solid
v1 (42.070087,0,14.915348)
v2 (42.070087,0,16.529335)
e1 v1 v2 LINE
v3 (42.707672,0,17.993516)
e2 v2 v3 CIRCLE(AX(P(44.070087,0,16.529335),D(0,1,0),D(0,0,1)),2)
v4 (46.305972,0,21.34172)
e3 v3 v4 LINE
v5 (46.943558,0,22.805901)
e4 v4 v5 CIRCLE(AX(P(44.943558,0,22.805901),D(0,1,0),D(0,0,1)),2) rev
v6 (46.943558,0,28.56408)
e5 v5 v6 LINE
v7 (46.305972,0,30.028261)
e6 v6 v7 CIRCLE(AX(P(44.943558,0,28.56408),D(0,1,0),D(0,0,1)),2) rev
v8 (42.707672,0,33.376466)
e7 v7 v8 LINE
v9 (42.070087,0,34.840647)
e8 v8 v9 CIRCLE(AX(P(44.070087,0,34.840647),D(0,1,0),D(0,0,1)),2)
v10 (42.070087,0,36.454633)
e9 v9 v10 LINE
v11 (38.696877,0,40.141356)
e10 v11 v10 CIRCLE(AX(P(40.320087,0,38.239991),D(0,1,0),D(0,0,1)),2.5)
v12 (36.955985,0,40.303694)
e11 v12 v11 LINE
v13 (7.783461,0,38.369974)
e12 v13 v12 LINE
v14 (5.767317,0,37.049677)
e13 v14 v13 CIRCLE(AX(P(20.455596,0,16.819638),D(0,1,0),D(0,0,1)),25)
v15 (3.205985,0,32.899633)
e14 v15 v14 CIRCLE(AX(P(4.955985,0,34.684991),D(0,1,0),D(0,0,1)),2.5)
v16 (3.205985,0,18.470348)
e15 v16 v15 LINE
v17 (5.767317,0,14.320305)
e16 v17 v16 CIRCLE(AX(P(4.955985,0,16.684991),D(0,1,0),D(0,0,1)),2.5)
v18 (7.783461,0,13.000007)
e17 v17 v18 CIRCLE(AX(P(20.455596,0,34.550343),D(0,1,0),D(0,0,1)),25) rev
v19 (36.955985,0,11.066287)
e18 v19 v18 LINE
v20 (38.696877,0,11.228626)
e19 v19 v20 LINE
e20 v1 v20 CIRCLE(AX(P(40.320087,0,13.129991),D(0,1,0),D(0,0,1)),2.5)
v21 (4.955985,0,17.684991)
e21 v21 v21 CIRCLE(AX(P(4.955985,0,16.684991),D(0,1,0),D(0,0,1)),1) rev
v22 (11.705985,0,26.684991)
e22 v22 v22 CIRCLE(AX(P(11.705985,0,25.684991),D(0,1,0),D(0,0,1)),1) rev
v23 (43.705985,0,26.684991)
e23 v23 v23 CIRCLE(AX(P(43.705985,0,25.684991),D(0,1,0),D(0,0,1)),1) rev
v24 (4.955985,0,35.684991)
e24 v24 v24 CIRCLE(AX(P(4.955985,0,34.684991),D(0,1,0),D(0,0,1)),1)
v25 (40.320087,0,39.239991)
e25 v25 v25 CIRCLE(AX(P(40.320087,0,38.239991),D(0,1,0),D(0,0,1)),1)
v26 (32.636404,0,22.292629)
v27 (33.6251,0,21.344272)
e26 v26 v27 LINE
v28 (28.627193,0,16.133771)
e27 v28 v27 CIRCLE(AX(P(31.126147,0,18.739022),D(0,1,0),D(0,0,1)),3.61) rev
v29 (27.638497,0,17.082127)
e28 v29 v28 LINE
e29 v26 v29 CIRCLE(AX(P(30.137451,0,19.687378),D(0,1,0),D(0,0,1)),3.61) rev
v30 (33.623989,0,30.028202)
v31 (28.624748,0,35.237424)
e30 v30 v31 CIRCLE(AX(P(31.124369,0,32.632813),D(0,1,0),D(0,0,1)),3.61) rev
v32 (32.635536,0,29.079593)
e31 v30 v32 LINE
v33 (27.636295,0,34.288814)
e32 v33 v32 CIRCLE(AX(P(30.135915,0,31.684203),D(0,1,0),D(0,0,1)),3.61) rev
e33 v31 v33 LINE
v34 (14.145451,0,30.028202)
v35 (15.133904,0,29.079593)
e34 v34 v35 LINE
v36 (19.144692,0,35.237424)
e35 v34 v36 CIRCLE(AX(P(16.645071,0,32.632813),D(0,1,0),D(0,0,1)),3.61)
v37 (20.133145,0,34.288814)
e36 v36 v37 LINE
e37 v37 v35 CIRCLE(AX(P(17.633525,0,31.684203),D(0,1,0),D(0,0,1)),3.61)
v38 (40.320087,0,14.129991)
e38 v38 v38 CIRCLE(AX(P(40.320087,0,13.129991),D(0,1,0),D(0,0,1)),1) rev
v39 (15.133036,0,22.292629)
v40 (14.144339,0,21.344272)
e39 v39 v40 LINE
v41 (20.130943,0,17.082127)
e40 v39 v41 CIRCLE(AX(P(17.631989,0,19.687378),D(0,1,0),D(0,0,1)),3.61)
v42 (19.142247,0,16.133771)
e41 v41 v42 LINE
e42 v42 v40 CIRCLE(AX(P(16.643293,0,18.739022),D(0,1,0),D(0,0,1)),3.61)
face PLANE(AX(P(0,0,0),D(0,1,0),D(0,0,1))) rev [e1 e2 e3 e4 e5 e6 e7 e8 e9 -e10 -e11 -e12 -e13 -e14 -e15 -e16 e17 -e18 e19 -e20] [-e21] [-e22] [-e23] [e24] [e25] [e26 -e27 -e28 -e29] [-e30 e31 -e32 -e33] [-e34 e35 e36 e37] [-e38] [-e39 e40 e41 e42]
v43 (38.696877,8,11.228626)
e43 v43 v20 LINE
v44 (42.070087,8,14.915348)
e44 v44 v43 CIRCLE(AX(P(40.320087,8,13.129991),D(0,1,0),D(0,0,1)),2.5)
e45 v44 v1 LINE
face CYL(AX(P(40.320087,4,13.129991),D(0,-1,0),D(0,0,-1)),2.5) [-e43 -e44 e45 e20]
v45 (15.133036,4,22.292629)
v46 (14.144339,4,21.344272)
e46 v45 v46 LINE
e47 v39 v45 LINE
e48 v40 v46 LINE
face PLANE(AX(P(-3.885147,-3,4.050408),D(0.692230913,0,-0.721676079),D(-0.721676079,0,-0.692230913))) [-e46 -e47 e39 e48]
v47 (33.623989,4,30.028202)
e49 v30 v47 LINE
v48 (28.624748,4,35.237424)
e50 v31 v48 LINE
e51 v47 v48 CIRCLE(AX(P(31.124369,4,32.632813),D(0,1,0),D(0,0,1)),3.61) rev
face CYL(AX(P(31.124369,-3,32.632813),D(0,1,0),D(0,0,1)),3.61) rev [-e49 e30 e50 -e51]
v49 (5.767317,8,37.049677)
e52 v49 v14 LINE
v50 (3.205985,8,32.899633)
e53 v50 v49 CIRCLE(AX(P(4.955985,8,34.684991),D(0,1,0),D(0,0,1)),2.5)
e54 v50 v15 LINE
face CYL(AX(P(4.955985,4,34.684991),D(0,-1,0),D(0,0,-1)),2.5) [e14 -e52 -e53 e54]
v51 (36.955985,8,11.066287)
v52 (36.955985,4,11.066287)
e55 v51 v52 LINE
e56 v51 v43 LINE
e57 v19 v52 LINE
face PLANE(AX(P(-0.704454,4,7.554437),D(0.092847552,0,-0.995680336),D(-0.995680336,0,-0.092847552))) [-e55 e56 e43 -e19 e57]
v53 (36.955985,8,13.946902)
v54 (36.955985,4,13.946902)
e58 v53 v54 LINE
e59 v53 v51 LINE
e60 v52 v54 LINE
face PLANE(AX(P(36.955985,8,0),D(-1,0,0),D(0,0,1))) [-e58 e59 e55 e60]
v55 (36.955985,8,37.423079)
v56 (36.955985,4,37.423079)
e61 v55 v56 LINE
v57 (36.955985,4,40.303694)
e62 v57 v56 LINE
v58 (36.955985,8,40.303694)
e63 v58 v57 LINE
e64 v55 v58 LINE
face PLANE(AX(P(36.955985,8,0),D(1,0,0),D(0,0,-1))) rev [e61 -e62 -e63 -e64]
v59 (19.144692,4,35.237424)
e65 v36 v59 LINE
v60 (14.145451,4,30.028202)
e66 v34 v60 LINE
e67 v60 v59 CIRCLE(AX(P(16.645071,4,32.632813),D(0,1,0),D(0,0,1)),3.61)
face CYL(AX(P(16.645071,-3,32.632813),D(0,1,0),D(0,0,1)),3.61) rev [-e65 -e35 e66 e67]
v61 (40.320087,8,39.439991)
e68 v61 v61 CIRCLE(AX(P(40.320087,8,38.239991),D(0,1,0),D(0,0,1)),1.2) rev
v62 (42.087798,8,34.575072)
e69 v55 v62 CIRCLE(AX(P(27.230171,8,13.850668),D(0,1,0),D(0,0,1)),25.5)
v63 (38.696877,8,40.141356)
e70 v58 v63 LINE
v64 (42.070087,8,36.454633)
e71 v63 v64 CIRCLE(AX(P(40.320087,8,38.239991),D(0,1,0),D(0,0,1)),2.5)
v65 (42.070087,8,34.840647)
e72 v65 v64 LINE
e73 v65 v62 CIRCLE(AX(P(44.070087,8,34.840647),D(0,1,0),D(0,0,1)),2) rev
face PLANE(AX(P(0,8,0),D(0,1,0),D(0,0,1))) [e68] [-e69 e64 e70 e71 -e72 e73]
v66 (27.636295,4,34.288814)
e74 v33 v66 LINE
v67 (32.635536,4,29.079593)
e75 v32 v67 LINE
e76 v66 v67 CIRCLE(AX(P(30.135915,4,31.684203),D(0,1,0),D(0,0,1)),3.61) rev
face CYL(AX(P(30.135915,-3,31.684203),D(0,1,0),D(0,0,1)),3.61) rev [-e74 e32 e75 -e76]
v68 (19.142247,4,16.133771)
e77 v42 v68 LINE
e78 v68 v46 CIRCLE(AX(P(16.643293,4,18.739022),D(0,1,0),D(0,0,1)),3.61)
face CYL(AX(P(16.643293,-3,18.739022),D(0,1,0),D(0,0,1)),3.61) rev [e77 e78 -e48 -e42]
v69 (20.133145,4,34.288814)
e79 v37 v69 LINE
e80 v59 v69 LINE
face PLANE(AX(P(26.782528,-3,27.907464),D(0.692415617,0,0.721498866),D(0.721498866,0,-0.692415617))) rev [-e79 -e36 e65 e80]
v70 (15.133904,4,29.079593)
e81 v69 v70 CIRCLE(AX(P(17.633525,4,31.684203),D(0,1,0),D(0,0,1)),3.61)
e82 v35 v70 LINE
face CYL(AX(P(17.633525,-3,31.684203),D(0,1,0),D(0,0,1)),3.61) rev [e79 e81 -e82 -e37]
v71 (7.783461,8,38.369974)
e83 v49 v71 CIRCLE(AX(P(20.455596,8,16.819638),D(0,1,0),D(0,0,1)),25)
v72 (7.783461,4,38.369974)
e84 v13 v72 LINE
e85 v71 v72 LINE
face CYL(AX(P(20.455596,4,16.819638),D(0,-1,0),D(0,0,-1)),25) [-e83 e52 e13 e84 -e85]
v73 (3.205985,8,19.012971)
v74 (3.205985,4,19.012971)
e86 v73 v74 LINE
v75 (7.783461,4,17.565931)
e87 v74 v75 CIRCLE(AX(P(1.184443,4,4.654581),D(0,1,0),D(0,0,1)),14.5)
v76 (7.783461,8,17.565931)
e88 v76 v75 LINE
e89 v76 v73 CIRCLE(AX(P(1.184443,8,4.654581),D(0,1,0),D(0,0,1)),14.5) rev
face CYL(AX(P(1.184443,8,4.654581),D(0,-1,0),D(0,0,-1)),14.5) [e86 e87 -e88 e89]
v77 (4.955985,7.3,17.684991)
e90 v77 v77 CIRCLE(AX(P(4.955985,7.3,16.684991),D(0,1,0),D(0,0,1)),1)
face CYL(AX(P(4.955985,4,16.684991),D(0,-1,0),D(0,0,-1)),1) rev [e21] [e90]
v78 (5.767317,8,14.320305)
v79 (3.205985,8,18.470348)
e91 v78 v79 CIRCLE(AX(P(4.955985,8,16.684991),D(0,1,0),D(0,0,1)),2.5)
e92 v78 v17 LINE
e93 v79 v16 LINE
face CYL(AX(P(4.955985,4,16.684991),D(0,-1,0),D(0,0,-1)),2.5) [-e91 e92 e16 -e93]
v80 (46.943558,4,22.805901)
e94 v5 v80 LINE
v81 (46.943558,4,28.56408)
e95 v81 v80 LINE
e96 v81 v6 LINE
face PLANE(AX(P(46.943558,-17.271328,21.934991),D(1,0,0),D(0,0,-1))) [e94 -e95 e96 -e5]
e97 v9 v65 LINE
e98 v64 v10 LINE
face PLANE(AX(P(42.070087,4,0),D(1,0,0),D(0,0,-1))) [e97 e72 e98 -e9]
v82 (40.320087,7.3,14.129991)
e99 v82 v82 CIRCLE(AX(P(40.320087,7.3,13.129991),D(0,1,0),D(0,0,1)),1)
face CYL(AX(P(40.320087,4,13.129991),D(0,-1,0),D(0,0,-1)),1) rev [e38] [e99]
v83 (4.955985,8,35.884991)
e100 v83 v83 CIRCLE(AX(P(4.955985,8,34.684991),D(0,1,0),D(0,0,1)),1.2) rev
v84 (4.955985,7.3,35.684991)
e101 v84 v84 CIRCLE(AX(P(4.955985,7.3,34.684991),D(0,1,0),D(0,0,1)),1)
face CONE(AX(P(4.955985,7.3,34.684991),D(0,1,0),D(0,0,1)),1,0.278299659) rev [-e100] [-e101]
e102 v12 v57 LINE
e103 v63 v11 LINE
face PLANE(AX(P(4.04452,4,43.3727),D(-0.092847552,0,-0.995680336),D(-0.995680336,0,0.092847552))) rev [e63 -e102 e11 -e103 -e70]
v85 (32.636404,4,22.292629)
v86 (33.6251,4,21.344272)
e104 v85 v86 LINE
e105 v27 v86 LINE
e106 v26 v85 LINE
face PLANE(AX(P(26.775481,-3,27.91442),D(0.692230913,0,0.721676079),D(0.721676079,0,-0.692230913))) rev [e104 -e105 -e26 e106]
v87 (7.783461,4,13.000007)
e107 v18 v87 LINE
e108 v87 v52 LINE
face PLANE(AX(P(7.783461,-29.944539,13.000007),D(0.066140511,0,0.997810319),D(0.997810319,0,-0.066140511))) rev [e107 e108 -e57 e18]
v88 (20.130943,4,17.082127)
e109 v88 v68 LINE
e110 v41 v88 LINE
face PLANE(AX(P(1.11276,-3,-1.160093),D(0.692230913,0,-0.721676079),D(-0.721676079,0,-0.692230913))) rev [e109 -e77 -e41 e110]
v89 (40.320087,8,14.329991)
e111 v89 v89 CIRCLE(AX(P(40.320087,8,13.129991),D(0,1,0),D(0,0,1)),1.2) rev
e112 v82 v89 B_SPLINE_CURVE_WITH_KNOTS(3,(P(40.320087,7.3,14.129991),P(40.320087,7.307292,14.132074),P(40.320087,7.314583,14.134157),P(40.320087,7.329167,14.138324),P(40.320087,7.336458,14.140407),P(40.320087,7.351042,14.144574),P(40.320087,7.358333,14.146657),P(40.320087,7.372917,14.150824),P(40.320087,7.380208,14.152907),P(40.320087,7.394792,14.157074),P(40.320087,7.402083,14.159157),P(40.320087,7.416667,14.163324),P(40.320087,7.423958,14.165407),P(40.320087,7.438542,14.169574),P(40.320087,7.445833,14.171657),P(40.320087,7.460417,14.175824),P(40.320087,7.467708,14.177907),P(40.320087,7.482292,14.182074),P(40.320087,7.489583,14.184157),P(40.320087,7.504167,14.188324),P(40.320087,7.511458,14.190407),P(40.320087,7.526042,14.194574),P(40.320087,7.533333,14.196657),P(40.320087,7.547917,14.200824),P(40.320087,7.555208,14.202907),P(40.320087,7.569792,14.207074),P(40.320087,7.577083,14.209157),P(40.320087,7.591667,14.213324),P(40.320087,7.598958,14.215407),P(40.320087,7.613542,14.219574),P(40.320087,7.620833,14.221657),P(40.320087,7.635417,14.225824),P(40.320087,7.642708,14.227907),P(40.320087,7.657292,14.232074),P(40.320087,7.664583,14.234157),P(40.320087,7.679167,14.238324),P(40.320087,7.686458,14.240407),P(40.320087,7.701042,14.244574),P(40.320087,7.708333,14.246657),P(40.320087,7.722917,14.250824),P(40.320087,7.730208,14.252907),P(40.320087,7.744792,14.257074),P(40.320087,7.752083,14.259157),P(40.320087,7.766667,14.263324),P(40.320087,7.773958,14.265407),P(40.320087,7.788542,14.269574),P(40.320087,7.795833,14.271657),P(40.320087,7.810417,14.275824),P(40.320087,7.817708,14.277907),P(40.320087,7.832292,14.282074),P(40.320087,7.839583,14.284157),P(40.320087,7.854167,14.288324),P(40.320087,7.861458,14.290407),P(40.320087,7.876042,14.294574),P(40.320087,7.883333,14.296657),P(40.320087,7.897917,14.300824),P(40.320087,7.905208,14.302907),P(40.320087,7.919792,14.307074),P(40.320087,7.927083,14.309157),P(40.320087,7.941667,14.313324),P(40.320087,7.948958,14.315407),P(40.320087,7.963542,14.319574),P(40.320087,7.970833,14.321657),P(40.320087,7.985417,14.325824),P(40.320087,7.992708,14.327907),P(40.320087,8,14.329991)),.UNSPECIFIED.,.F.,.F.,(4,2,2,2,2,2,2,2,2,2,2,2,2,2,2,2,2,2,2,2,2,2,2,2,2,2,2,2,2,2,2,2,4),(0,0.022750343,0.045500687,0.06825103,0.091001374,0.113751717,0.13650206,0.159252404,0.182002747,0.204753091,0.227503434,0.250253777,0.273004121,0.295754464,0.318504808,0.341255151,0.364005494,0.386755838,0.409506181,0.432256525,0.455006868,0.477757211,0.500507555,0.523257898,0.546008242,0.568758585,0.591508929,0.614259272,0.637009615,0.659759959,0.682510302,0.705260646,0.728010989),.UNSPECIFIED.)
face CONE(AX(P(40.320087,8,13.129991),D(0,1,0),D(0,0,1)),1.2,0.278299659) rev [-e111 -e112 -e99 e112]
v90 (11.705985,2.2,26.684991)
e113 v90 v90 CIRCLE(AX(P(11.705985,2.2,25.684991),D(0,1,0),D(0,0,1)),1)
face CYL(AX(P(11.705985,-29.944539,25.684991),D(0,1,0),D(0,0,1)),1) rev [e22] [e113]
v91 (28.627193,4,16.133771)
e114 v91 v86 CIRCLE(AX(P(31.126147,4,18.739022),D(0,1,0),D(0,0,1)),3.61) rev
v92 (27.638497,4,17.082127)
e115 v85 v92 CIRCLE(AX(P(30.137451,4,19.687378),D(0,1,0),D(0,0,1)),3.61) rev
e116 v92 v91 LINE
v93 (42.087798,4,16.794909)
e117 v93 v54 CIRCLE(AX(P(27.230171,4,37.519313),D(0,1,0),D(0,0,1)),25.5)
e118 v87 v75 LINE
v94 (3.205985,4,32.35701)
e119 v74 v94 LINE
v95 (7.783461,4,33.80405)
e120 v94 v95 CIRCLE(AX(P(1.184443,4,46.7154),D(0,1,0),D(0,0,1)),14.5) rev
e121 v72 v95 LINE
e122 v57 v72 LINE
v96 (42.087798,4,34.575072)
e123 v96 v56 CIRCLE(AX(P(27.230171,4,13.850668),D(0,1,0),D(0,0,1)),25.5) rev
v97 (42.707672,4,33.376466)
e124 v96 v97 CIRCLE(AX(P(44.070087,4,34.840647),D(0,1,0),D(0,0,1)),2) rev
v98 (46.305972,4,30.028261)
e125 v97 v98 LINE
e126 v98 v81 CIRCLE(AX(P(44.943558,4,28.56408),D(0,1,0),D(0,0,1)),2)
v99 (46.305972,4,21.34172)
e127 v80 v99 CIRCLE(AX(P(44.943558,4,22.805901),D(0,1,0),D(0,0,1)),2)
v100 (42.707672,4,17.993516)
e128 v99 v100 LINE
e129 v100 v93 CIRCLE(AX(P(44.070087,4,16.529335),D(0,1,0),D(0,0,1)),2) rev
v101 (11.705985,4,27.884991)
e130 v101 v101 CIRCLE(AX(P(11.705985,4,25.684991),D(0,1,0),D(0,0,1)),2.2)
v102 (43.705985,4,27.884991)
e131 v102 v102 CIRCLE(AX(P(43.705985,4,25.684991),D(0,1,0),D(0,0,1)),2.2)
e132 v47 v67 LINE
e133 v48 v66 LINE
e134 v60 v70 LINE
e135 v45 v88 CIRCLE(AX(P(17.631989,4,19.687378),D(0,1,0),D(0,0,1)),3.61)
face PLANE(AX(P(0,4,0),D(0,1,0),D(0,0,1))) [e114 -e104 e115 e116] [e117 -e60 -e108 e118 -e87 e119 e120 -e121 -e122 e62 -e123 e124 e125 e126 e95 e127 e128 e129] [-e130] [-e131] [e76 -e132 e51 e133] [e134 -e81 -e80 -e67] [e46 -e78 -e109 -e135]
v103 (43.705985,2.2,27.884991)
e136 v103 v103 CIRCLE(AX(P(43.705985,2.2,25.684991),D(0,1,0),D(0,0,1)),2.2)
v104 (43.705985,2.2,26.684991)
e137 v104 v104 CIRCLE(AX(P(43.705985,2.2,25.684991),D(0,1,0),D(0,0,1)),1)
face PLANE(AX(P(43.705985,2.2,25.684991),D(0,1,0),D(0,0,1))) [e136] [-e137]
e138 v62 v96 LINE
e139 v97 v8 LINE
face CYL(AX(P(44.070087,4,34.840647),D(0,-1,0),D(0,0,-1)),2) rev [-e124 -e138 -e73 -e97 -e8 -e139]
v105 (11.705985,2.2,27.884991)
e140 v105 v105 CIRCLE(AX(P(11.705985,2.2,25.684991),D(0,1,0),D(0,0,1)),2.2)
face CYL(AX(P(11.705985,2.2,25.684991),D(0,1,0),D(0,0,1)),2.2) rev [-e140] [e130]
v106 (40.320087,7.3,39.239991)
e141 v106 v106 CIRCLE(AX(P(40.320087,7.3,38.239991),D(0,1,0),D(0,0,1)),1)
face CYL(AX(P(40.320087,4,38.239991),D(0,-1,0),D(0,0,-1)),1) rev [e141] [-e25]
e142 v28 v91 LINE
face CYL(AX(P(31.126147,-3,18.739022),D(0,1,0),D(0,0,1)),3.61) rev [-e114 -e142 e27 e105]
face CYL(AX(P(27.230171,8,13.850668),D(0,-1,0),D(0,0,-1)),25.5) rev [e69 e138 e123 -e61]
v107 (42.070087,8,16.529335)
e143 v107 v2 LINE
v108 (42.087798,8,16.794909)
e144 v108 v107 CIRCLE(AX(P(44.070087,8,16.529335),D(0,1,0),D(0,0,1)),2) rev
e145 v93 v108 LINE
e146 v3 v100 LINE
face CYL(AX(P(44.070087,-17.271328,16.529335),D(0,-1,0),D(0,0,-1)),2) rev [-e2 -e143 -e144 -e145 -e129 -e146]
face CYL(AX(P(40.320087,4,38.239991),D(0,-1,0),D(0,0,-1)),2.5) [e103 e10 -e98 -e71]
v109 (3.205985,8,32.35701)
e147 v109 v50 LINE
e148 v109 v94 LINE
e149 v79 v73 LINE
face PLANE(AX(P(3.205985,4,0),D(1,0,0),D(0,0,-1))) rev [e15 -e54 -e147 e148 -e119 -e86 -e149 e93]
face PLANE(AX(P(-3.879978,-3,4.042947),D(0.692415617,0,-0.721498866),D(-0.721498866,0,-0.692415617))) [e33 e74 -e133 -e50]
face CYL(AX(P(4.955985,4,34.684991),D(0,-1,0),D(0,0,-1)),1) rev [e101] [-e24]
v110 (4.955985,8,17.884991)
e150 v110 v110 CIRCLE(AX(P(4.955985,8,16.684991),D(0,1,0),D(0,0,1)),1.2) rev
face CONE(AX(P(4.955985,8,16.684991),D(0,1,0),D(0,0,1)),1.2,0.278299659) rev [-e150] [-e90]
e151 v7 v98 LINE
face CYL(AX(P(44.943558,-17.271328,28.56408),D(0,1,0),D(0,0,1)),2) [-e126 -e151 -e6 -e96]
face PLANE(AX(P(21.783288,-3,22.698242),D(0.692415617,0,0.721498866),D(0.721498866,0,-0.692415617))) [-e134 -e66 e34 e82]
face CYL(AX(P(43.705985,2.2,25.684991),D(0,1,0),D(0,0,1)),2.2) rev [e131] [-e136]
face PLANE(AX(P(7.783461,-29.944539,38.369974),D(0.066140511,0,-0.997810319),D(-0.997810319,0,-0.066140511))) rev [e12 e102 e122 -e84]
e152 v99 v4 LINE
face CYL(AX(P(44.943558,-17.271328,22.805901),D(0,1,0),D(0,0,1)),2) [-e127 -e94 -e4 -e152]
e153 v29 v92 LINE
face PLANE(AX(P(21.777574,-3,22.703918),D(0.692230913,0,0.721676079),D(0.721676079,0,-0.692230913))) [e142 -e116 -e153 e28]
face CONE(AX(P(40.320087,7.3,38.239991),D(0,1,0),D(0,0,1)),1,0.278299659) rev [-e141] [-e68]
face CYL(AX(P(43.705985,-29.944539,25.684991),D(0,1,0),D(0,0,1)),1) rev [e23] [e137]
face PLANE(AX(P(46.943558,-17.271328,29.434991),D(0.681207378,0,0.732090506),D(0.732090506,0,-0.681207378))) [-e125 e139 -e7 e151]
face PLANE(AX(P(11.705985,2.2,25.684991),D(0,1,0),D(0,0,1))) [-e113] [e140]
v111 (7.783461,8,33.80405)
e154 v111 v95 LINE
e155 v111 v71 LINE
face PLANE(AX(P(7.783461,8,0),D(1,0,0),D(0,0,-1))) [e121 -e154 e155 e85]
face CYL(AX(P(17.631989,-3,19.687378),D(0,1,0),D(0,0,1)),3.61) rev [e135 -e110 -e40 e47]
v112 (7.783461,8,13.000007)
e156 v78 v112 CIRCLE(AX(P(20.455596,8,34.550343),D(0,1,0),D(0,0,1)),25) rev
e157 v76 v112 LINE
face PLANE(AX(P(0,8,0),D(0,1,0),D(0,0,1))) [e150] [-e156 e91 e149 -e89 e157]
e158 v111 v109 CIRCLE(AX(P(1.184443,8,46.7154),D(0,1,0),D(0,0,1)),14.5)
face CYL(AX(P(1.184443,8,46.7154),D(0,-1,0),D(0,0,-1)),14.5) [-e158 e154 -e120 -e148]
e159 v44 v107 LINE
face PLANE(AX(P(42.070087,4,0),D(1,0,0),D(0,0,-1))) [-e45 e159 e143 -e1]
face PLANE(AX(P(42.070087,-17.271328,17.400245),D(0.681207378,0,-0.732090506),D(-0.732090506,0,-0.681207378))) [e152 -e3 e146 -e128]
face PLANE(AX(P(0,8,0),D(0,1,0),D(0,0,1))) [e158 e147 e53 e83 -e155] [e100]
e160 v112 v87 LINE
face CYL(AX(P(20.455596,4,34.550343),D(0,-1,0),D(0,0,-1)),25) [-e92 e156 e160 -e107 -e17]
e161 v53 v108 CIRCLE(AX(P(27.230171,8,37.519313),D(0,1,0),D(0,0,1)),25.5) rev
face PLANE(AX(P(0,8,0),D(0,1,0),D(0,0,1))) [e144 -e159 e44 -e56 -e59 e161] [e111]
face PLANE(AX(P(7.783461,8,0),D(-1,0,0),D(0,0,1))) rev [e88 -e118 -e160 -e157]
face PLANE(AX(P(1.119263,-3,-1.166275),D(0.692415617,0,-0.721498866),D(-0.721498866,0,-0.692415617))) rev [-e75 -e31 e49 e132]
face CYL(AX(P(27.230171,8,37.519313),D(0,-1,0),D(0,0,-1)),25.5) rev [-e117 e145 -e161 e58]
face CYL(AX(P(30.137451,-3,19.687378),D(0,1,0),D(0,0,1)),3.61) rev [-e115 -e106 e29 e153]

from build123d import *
from OCP.BRepFilletAPI import BRepFilletAPI_MakeChamfer

# Parameters (mm, degrees)
SKETCH1_R           = 1
BOSS_EXTRUDE1_DEPTH = 4
SKETCH1_5_R         = 1
BOSS_EXTRUDE2_DEPTH = 8
CUT_EXTRUDE1_DEPTH  = 7
SKETCH4_R           = 1
BOSS_EXTRUDE3_DEPTH = 4
SKETCH3_R           = 2
CUT_EXTRUDE2_DEPTH  = 1.8
MOVE_START          = 4
MOVE_FACE1_DEPTH    = 4
MOVE_FACE2_BY       = 0.2
MOVE_FACE2_2_BY     = 0.2
CHAMFER1_SIZE       = 0.7
CHAMFER1_SIZE2      = 0.2
CHAMFER2_SIZE       = 0.2
CHAMFER2_SIZE2      = 0.7
SKETCH5_R           = 1
CUT_EXTRUDE3_DEPTH  = 4
FILLET1_R           = 2


# Read off the part's stored shape, not the designer's step: Move Face1
with BuildPart() as part:
    # Sketch1 → Boss-Extrude1 (new body)
    with BuildSketch(Plane(origin=(0, 0, 0), x_dir=(1, 0, 0), z_dir=(0, 1, 0))):
        with BuildLine():
            Line((24.824168418, -41.434990566), (38.696876617, -40.141355505))
            ThreePointArc((38.696876617, -40.141355505), (42.164537627, -39.927592778), (42.070086822, -36.454633459))
            Line((42.070086822, -36.454633459), (42.070086822, -14.915347673))
            ThreePointArc((42.070086822, -14.915347673), (42.164537627, -11.442388354), (38.696876617, -11.228625627))
            Line((38.696876617, -11.228625627), (24.824168418, -9.934990566))
            ThreePointArc((24.824168418, -9.934990566), (14.849186159, -10.187088505), (5.767316865, -14.320304511))
            ThreePointArc((5.767316865, -14.320304511), (2.828547545, -15.371974531), (3.205984711, -18.470347673))
            Line((3.205984711, -18.470347673), (3.205984711, -32.899633459))
            ThreePointArc((3.205984711, -32.899633459), (2.828547545, -35.998006601), (5.767316865, -37.04967662))
            ThreePointArc((5.767316865, -37.04967662), (14.849186159, -41.182892626), (24.824168418, -41.434990566))
        make_face()
        with Locations(Location((4.955984711, -34.684990566, 0), (0, 0, 270))):
            Circle(SKETCH1_R, mode=Mode.SUBTRACT)
        with Locations(Location((24.824168418, -37.934990566, 0), (0, 0, 270))):
            Circle(SKETCH1_R, mode=Mode.SUBTRACT)
        with Locations(Location((40.320086822, -38.239990566, 0), (0, 0, 270))):
            Circle(SKETCH1_R, mode=Mode.SUBTRACT)
        with Locations(Location((4.955984711, -16.684990566, 0), (0, 0, 270))):
            Circle(SKETCH1_R, mode=Mode.SUBTRACT)
        with Locations(Location((24.824168418, -13.434990566, 0), (0, 0, 270))):
            Circle(SKETCH1_R, mode=Mode.SUBTRACT)
        with Locations(Location((40.320086822, -13.129990566, 0), (0, 0, 270))):
            Circle(SKETCH1_R, mode=Mode.SUBTRACT)
    extrude(amount=BOSS_EXTRUDE1_DEPTH)

    # Sketch1<5> → Boss-Extrude2 (add)
    # profile 1 of 8: a face of its own
    with BuildSketch(Plane(origin=(0, 0, 0), x_dir=(1, 0, 0), z_dir=(0, 1, 0))):
        with BuildLine():
            ThreePointArc((5.767316865, -37.04967662), (6.75947019, -37.734134037), (7.783460986, -38.369974447))
            Line((7.783460986, -38.369974447), (7.783460986, -33.244952788))
            ThreePointArc((7.783460986, -33.244952788), (6.373824255, -32.641654601), (4.909963227, -32.185414197))
            ThreePointArc((4.909963227, -32.185414197), (4.062798529, -31.99415486), (3.205984711, -31.852245597))
            Line((3.205984711, -31.852245597), (3.205984711, -32.899633459))
            Line((3.205984711, -32.899633459), (3.205984711, -34.684990566))
            ThreePointArc((3.205984711, -34.684990566), (3.718547844, -35.922427433), (4.955984711, -36.434990566))
            ThreePointArc((4.955984711, -36.434990566), (5.358522051, -36.746463253), (5.767316865, -37.04967662))
        make_face()
        with Locations(Location((4.955984711, -34.684990566, 0), (0, 0, 270))):
            Circle(SKETCH1_5_R, mode=Mode.SUBTRACT)
    # profile 2 of 8: a face of its own
    with BuildSketch(Plane(origin=(0, 0, 0), x_dir=(1, 0, 0), z_dir=(0, 1, 0))):
        with BuildLine():
            ThreePointArc((36.955984711, -14.488712586), (39.599003683, -15.793476237), (42.070086822, -17.400244917))
            Line((42.070086822, -17.400244917), (42.070086822, -14.915347673))
            Line((42.070086822, -14.915347673), (42.070086822, -13.129990566))
            ThreePointArc((42.070086822, -13.129990566), (41.557523689, -11.892553699), (40.320086822, -11.379990566))
            Line((40.320086822, -11.379990566), (38.696876617, -11.228625627))
            Line((38.696876617, -11.228625627), (36.955984711, -11.066286826))
            Line((36.955984711, -11.066286826), (36.955984711, -14.488712586))
        make_face()
        with Locations(Location((40.320086822, -13.129990566, 0), (0, 0, 270))):
            Circle(SKETCH1_5_R, mode=Mode.SUBTRACT)
    # profile 3 of 8: a face of its own
    with BuildSketch(Plane(origin=(0, 0, 0), x_dir=(1, 0, 0), z_dir=(0, 1, 0))):
        with BuildLine():
            Line((3.205984711, -18.470347673), (3.205984711, -19.517735535))
            ThreePointArc((3.205984711, -19.517735535), (5.55061073, -19.005071272), (7.783460986, -18.125028343))
            Line((7.783460986, -18.125028343), (7.783460986, -13.000006684))
            ThreePointArc((7.783460986, -13.000006684), (6.75947019, -13.635847094), (5.767316865, -14.320304511))
            ThreePointArc((5.767316865, -14.320304511), (5.358522051, -14.623517879), (4.955984711, -14.934990566))
            ThreePointArc((4.955984711, -14.934990566), (3.718547844, -15.447553699), (3.205984711, -16.684990566))
            Line((3.205984711, -16.684990566), (3.205984711, -18.470347673))
        make_face()
        with Locations(Location((4.955984711, -16.684990566, 0), (0, 0, 270))):
            Circle(SKETCH1_5_R, mode=Mode.SUBTRACT)
    # profile 4 of 8: a face of its own
    with BuildSketch(Plane(origin=(0, 0, 0), x_dir=(1, 0, 0), z_dir=(0, 1, 0))):
        with BuildLine():
            Line((36.955984711, -36.881268545), (36.955984711, -40.303694305))
            Line((36.955984711, -40.303694305), (38.696876617, -40.141355505))
            Line((38.696876617, -40.141355505), (40.320086822, -39.989990566))
            ThreePointArc((40.320086822, -39.989990566), (41.557523689, -39.477427433), (42.070086822, -38.239990566))
            Line((42.070086822, -38.239990566), (42.070086822, -36.454633459))
            Line((42.070086822, -36.454633459), (42.070086822, -33.969736214))
            ThreePointArc((42.070086822, -33.969736214), (39.599003683, -35.576504894), (36.955984711, -36.881268545))
        make_face()
        with Locations(Location((40.320086822, -38.239990566, 0), (0, 0, 270))):
            Circle(SKETCH1_5_R, mode=Mode.SUBTRACT)
    # profile 5 of 8: a face of its own
    with BuildSketch(Plane(origin=(0, 0, 0), x_dir=(1, 0, 0), z_dir=(0, 1, 0))):
        with BuildLine():
            ThreePointArc((5.767316865, -14.320304511), (2.828547545, -15.371974531), (3.205984711, -18.470347673))
            Line((3.205984711, -18.470347673), (3.205984711, -16.684990566))
            ThreePointArc((3.205984711, -16.684990566), (3.718547844, -15.447553699), (4.955984711, -14.934990566))
            ThreePointArc((4.955984711, -14.934990566), (5.358522051, -14.623517879), (5.767316865, -14.320304511))
        make_face()
    # profile 6 of 8: a face of its own
    with BuildSketch(Plane(origin=(0, 0, 0), x_dir=(1, 0, 0), z_dir=(0, 1, 0))):
        with BuildLine():
            ThreePointArc((3.205984711, -32.899633459), (2.828547545, -35.998006601), (5.767316865, -37.04967662))
            ThreePointArc((5.767316865, -37.04967662), (5.358522051, -36.746463253), (4.955984711, -36.434990566))
            ThreePointArc((4.955984711, -36.434990566), (3.718547844, -35.922427433), (3.205984711, -34.684990566))
            Line((3.205984711, -34.684990566), (3.205984711, -32.899633459))
        make_face()
    # profile 7 of 8: a face of its own
    with BuildSketch(Plane(origin=(0, 0, 0), x_dir=(1, 0, 0), z_dir=(0, 1, 0))):
        with BuildLine():
            Line((42.070086822, -13.129990566), (42.070086822, -14.915347673))
            ThreePointArc((42.070086822, -14.915347673), (42.164537627, -11.442388354), (38.696876617, -11.228625627))
            Line((38.696876617, -11.228625627), (40.320086822, -11.379990566))
            ThreePointArc((40.320086822, -11.379990566), (41.557523689, -11.892553699), (42.070086822, -13.129990566))
        make_face()
    # profile 8 of 8: a face of its own
    with BuildSketch(Plane(origin=(0, 0, 0), x_dir=(1, 0, 0), z_dir=(0, 1, 0))):
        with BuildLine():
            Line((40.320086822, -39.989990566), (38.696876617, -40.141355505))
            ThreePointArc((38.696876617, -40.141355505), (42.164537627, -39.927592778), (42.070086822, -36.454633459))
            Line((42.070086822, -36.454633459), (42.070086822, -38.239990566))
            ThreePointArc((42.070086822, -38.239990566), (41.557523689, -39.477427433), (40.320086822, -39.989990566))
        make_face()
    extrude(amount=BOSS_EXTRUDE2_DEPTH)

    # Sketch2 → Cut-Extrude1 (cut)
    # profile 1 of 7: a face of its own
    with BuildSketch(Plane(origin=(0, 4, 0), x_dir=(1, 0, 0), z_dir=(0, 1, 0))):
        with BuildLine():
            Line((15.133035567, -22.292628664), (14.144339339, -21.344272313))
            ThreePointArc((14.144339339, -21.344272313), (14.038042286, -16.240068072), (19.142246528, -16.13377102))
            Line((19.142246528, -16.13377102), (20.130942756, -17.08212737))
            ThreePointArc((20.130942756, -17.08212737), (20.237239809, -22.186331611), (15.133035567, -22.292628664))
        make_face()
        with BuildLine():
            ThreePointArc((17.757784702, -17.577123179), (15.481394445, -17.624529897), (15.528801164, -19.900920155))
            Line((15.528801164, -19.900920155), (16.517497393, -20.849276505))
            ThreePointArc((16.517497393, -20.849276505), (18.79388765, -20.801869786), (18.746480931, -18.525479529))
            Line((18.746480931, -18.525479529), (17.757784702, -17.577123179))
        make_face(mode=Mode.SUBTRACT)
    # profile 2 of 7: a face of its own
    with BuildSketch(Plane(origin=(0, 4, 0), x_dir=(1, 0, 0), z_dir=(0, 1, 0))):
        with BuildLine():
            ThreePointArc((32.636404248, -22.292628664), (27.532200006, -22.186331611), (27.638497059, -17.08212737))
            Line((27.638497059, -17.08212737), (28.627193287, -16.13377102))
            ThreePointArc((28.627193287, -16.13377102), (33.731397529, -16.240068072), (33.625100476, -21.344272313))
            Line((33.625100476, -21.344272313), (32.636404248, -22.292628664))
        make_face()
        with BuildLine():
            Line((29.022958884, -18.525479529), (30.011655113, -17.577123179))
            ThreePointArc((30.011655113, -17.577123179), (32.28804537, -17.624529897), (32.240638651, -19.900920155))
            Line((32.240638651, -19.900920155), (31.251942422, -20.849276505))
            ThreePointArc((31.251942422, -20.849276505), (28.975552165, -20.801869786), (29.022958884, -18.525479529))
        make_face(mode=Mode.SUBTRACT)
    # profile 3 of 7: a face of its own
    with BuildSketch(Plane(origin=(0, 4, 0), x_dir=(1, 0, 0), z_dir=(0, 1, 0))):
        with BuildLine():
            ThreePointArc((30.011655113, -17.577123179), (32.28804537, -17.624529897), (32.240638651, -19.900920155))
            Line((32.240638651, -19.900920155), (31.251942422, -20.849276505))
            ThreePointArc((31.251942422, -20.849276505), (28.975552165, -20.801869786), (29.022958884, -18.525479529))
            Line((29.022958884, -18.525479529), (30.011655113, -17.577123179))
        make_face()
    # profile 4 of 7: a face of its own
    with BuildSketch(Plane(origin=(0, 4, 0), x_dir=(1, 0, 0), z_dir=(0, 1, 0))):
        with BuildLine():
            ThreePointArc((33.623989066, -30.028201915), (33.728979595, -35.132433198), (28.624748312, -35.237423727))
            Line((28.624748312, -35.237423727), (27.636294866, -34.288814332))
            ThreePointArc((27.636294866, -34.288814332), (27.531304337, -29.184583049), (32.63553562, -29.07959252))
            Line((32.63553562, -29.07959252), (33.623989066, -30.028201915))
        make_face()
        with BuildLine():
            Line((30.009579546, -33.794425995), (29.0211261, -32.8458166))
            ThreePointArc((29.0211261, -32.8458166), (28.974302069, -30.569414283), (31.250704386, -30.522590252))
            Line((31.250704386, -30.522590252), (32.239157832, -31.471199647))
            ThreePointArc((32.239157832, -31.471199647), (32.285981863, -33.747601964), (30.009579546, -33.794425995))
        make_face(mode=Mode.SUBTRACT)
    # profile 5 of 7: a face of its own
    with BuildSketch(Plane(origin=(0, 4, 0), x_dir=(1, 0, 0), z_dir=(0, 1, 0))):
        with BuildLine():
            ThreePointArc((29.0211261, -32.8458166), (28.974302069, -30.569414283), (31.250704386, -30.522590252))
            Line((31.250704386, -30.522590252), (32.239157832, -31.471199647))
            ThreePointArc((32.239157832, -31.471199647), (32.285981863, -33.747601964), (30.009579546, -33.794425995))
            Line((30.009579546, -33.794425995), (29.0211261, -32.8458166))
        make_face()
    # profile 6 of 7: a face of its own
    with BuildSketch(Plane(origin=(0, 4, 0), x_dir=(1, 0, 0), z_dir=(0, 1, 0))):
        with BuildLine():
            Line((14.145450749, -30.028201915), (15.133904195, -29.07959252))
            ThreePointArc((15.133904195, -29.07959252), (20.238135478, -29.184583049), (20.133144949, -34.288814332))
            Line((20.133144949, -34.288814332), (19.144691503, -35.237423727))
            ThreePointArc((19.144691503, -35.237423727), (14.04046022, -35.132433198), (14.145450749, -30.028201915))
        make_face()
        with BuildLine():
            ThreePointArc((18.748313715, -32.8458166), (18.795137746, -30.569414283), (16.518735429, -30.522590252))
            Line((16.518735429, -30.522590252), (15.530281983, -31.471199647))
            ThreePointArc((15.530281983, -31.471199647), (15.483457952, -33.747601964), (17.759860269, -33.794425995))
            Line((17.759860269, -33.794425995), (18.748313715, -32.8458166))
        make_face(mode=Mode.SUBTRACT)
    # profile 7 of 7: a face of its own
    with BuildSketch(Plane(origin=(0, 4, 0), x_dir=(1, 0, 0), z_dir=(0, 1, 0))):
        with BuildLine():
            Line((17.759860269, -33.794425995), (18.748313715, -32.8458166))
            ThreePointArc((18.748313715, -32.8458166), (18.795137746, -30.569414283), (16.518735429, -30.522590252))
            Line((16.518735429, -30.522590252), (15.530281983, -31.471199647))
            ThreePointArc((15.530281983, -31.471199647), (15.483457952, -33.747601964), (17.759860269, -33.794425995))
        make_face()
    extrude(amount=-CUT_EXTRUDE1_DEPTH, mode=Mode.SUBTRACT)


with BuildPart() as cut_extrude1_kept_piece:
    # of the separate pieces the step leaves, the one the design keeps (cut_extrude1_pieces_kept)
    add(part.part.solids().sort_by_distance((24.824168418, 0, 41.434990566))[0])

    # Sketch4 → Boss-Extrude3 (add)
    with BuildSketch(Plane(origin=(0, 4, 0), x_dir=(1, 0, 0), z_dir=(0, 1, 0))):
        with Locations((24.824168418, -13.434990566)):
            Circle(SKETCH4_R)
        with Locations((24.824168418, -37.934990566)):
            Circle(SKETCH4_R)
        Polygon((42.070086822, -17.400244917), (46.943557579, -21.934990566), (46.943557579, -29.434990566), (42.070086822, -33.969736214), align=None)
    extrude(amount=-BOSS_EXTRUDE3_DEPTH)

    # Sketch3 → Cut-Extrude2 (cut)
    with BuildSketch(Plane(origin=(0, 4, 0), x_dir=(1, 0, 0), z_dir=(0, 1, 0))):
        with Locations(Location((11.705984711, -25.684990566, 0), (0, 0, 270))):
            Circle(SKETCH3_R)
        with Locations(Location((43.705984711, -25.684990566, 0), (0, 0, 270))):
            Circle(SKETCH3_R)
    extrude(amount=-CUT_EXTRUDE2_DEPTH, mode=Mode.SUBTRACT)

    # Move Face1 outline → Move Face1 (cut)
    with BuildSketch(Plane(origin=(0, 0, 0), x_dir=(1, 0, 0), z_dir=(0, 1, 0)).offset(MOVE_START)):
        with BuildLine():
            Line((7.783460986, -18.125028343), (7.783460986, -17.565930728))
            ThreePointArc((7.783460986, -17.565930728), (5.555025764, -18.48020931), (3.205984711, -19.012970982))
            Line((3.205984711, -19.012970982), (3.205984711, -19.517735535))
            ThreePointArc((3.205984711, -19.517735535), (5.550610731, -19.005071272), (7.783460986, -18.125028343))
        make_face()
        with BuildLine():
            ThreePointArc((7.783460986, -33.244952788), (5.550610731, -32.364909859), (3.205984711, -31.852245597))
            Line((3.205984711, -31.852245597), (3.205984711, -32.357010149))
            ThreePointArc((3.205984711, -32.357010149), (5.555025764, -32.889771821), (7.783460986, -33.804050403))
            Line((7.783460986, -33.804050403), (7.783460986, -33.244952788))
        make_face()
        with BuildLine():
            ThreePointArc((42.070086822, -16.782223018), (39.594576687, -15.217486228), (36.955984711, -13.946902097))
            Line((36.955984711, -13.946902097), (36.955984711, -14.488712586))
            ThreePointArc((36.955984711, -14.488712586), (39.599003683, -15.793476237), (42.070086822, -17.400244917))
            Line((42.070086822, -17.400244917), (42.070086822, -16.782223018))
        make_face()
        with BuildLine():
            ThreePointArc((36.955984711, -37.423079034), (39.594576687, -36.152494903), (42.070086822, -34.587758113))
            Line((42.070086822, -34.587758113), (42.070086822, -33.969736214))
            ThreePointArc((42.070086822, -33.969736214), (39.599003683, -35.576504894), (36.955984711, -36.881268545))
            Line((36.955984711, -36.881268545), (36.955984711, -37.423079034))
        make_face()
    extrude(amount=MOVE_FACE1_DEPTH, mode=Mode.SUBTRACT)

    # Move Face2: a curved face moved inward by 0.2
    add(Solid.thicken(cut_extrude1_kept_piece.faces().sort_by_distance((11.705984711, 3.1, 23.684990566))[0], -MOVE_FACE2_BY), mode=Mode.SUBTRACT)

    # Move Face2 2: a curved face moved inward by 0.2
    add(Solid.thicken(cut_extrude1_kept_piece.faces().sort_by_distance((43.705984711, 3.1, 23.684990566))[0], -MOVE_FACE2_2_BY), mode=Mode.SUBTRACT)

    # Chamfer1: one chamfer whose edges measure the first distance from different faces: ONE call of the kernel's chamfer builder (chamfer() names one face for all edges)
    chamfer1_edges_1 = [cut_extrude1_kept_piece.edges().sort_by_distance(p)[0] for p in [
        (40.320086822, 8, 12.129990566),
    ]]
    chamfer1_side_1 = [cut_extrude1_kept_piece.faces().sort_by_distance(p)[0] for p in [
        (40.320086822, 4, 12.129990566),
    ]]
    chamfer1_edges_2 = [cut_extrude1_kept_piece.edges().sort_by_distance(p)[0] for p in [
        (4.955984711, 8, 15.684990566),
    ]]
    chamfer1_side_2 = [cut_extrude1_kept_piece.faces().sort_by_distance(p)[0] for p in [
        (4.955984711, 4, 15.684990566),
    ]]
    chamfer1 = BRepFilletAPI_MakeChamfer(cut_extrude1_kept_piece.part.solid().wrapped)
    for e in chamfer1_edges_1:
        chamfer1.Add(CHAMFER1_SIZE, CHAMFER1_SIZE2, e.wrapped, chamfer1_side_1[0].wrapped)  # the first distance lies on this face
    for e in chamfer1_edges_2:
        chamfer1.Add(CHAMFER1_SIZE, CHAMFER1_SIZE2, e.wrapped, chamfer1_side_2[0].wrapped)  # the first distance lies on this face
    add(Compound.cast(chamfer1.Shape()), mode=Mode.REPLACE)

    # Chamfer2: one chamfer whose edges measure the first distance from different faces: ONE call of the kernel's chamfer builder (chamfer() names one face for all edges)
    chamfer2_edges_1 = [cut_extrude1_kept_piece.edges().sort_by_distance(p)[0] for p in [
        (40.320086822, 8, 37.239990566),
    ]]
    chamfer2_side_1 = [cut_extrude1_kept_piece.faces().sort_by_distance(p)[0] for p in [
        (41.985094082, 8, 35.521195786),
    ]]
    chamfer2_edges_2 = [cut_extrude1_kept_piece.edges().sort_by_distance(p)[0] for p in [
        (4.955984711, 8, 33.684990566),
    ]]
    chamfer2_side_2 = [cut_extrude1_kept_piece.faces().sort_by_distance(p)[0] for p in [
        (3.286320097, 8, 32.628321804),
    ]]
    chamfer2 = BRepFilletAPI_MakeChamfer(cut_extrude1_kept_piece.part.solid().wrapped)
    for e in chamfer2_edges_1:
        chamfer2.Add(CHAMFER2_SIZE, CHAMFER2_SIZE2, e.wrapped, chamfer2_side_1[0].wrapped)  # the first distance lies on this face
    for e in chamfer2_edges_2:
        chamfer2.Add(CHAMFER2_SIZE, CHAMFER2_SIZE2, e.wrapped, chamfer2_side_2[0].wrapped)  # the first distance lies on this face
    add(Compound.cast(chamfer2.Shape()), mode=Mode.REPLACE)

    # Sketch5 → Cut-Extrude3 (cut)
    with BuildSketch(Plane(origin=(0, 4, 0), x_dir=(1, 0, 0), z_dir=(0, 1, 0))):
        with Locations(Location((11.705984711, -25.684990566, 0), (0, 0, 270))):
            Circle(SKETCH5_R)
        with Locations(Location((43.705984711, -25.684990566, 0), (0, 0, 270))):
            Circle(SKETCH5_R)
        Polygon((7.783460986, -38.369974447), (36.955984711, -40.303694305), (18.435611248, -45.125660457), align=None)
        Polygon((7.783460986, -13.000006684), (36.955984711, -11.066286826), (18.435611248, -6.244320675), align=None)
    extrude(amount=-CUT_EXTRUDE3_DEPTH, mode=Mode.SUBTRACT)

    # Fillet1
    # the kernel refuses this fillet: 2 mm, written as the material it adds along each edge
    with BuildSketch(Plane(origin=(42.070086822, 9.225462477, 17.400244917), x_dir=(0, 0, -1), z_dir=(0, -1, 0))) as fillet1_piece_1_section:
        with BuildLine():
            CenterArc((FILLET1_R * 0.435455206446, FILLET1_R), FILLET1_R, 222.93806399, 47.06193601)
            Line((-FILLET1_R * 0.296635299284, FILLET1_R * 0.31879262231), (-FILLET1_R * 0.311277109399, FILLET1_R * 0.305168474756))
            Line((-FILLET1_R * 0.311277109399, FILLET1_R * 0.305168474756), (-FILLET1_R * 0.00870910412891, -FILLET1_R * 0.02))
            Line((-FILLET1_R * 0.00870910412891, -FILLET1_R * 0.02), (FILLET1_R * 0.435455206446, -FILLET1_R * 0.02))
            Line((FILLET1_R * 0.435455206446, -FILLET1_R * 0.02), (FILLET1_R * 0.435455206446, 0))
        make_face()
    fillet1_piece_1 = extrude(amount=9.225462477, mode=Mode.PRIVATE)
    fillet1_piece_1 = split(fillet1_piece_1, bisect_by=Plane(origin=(42.053770569, 8, 16.658681976), z_dir=(0, -1, 0)), keep=Keep.TOP, mode=Mode.PRIVATE)
    fillet1_piece_1 = fillet1_piece_1 - Plane(origin=(27.230170636, 6, 37.51931267), x_dir=(0.5819574976530117, 0, -0.8132192022606481), z_dir=(0, -1, 0)) * Cylinder(25.499999993, 22, mode=Mode.PRIVATE)
    fillet1_piece_1 = split(fillet1_piece_1, bisect_by=Plane(origin=(42.053770569, 4, 16.658681976), z_dir=(0, 1, 0)), keep=Keep.TOP, mode=Mode.PRIVATE)
    add(fillet1_piece_1)
    with BuildSketch(Plane(origin=(42.070086822, 4, 17.400244917), x_dir=(0, 0, -1), z_dir=(0, -1, 0))) as fillet1_piece_2_section:
        with BuildLine():
            CenterArc((FILLET1_R * 0.435455206446, FILLET1_R), FILLET1_R, 222.93806399, 47.06193601)
            Line((-FILLET1_R * 0.296635299284, FILLET1_R * 0.31879262231), (-FILLET1_R * 0.311277109399, FILLET1_R * 0.305168474756))
            Line((-FILLET1_R * 0.311277109399, FILLET1_R * 0.305168474756), (-FILLET1_R * 0.00870910412891, -FILLET1_R * 0.02))
            Line((-FILLET1_R * 0.00870910412891, -FILLET1_R * 0.02), (FILLET1_R * 0.435455206446, -FILLET1_R * 0.02))
            Line((FILLET1_R * 0.435455206446, -FILLET1_R * 0.02), (FILLET1_R * 0.435455206446, 0))
        make_face()
    fillet1_piece_2 = extrude(amount=4, mode=Mode.PRIVATE)
    fillet1_piece_2 = fillet1_piece_2 - Plane(origin=(27.230170636, 2, 37.51931267), x_dir=(0.5819574976530117, 0, -0.8132192022606481), z_dir=(0, -1, 0)) * Cylinder(25.499999993, 12, mode=Mode.PRIVATE)
    add(fillet1_piece_2)
    with BuildSketch(Plane(origin=(42.070086822, 4, 17.400244917), x_dir=(0, 0, -1), z_dir=(0, -1, 0))) as fillet1_piece_3_section:
        with BuildLine():
            CenterArc((FILLET1_R * 0.435455206446, FILLET1_R), FILLET1_R, 222.93806399, 47.06193601)
            Line((-FILLET1_R * 0.296635299284, FILLET1_R * 0.31879262231), (-FILLET1_R * 0.311277109399, FILLET1_R * 0.305168474756))
            Line((-FILLET1_R * 0.311277109399, FILLET1_R * 0.305168474756), (-FILLET1_R * 0.00870910412891, -FILLET1_R * 0.02))
            Line((-FILLET1_R * 0.00870910412891, -FILLET1_R * 0.02), (FILLET1_R * 0.435455206446, -FILLET1_R * 0.02))
            Line((FILLET1_R * 0.435455206446, -FILLET1_R * 0.02), (FILLET1_R * 0.435455206446, 0))
        make_face()
    fillet1_piece_3 = extrude(amount=4, mode=Mode.PRIVATE)
    fillet1_piece_3 = fillet1_piece_3 & Plane(origin=(27.230170636, 2, 37.51931267), x_dir=(0.5819574976530117, 0, -0.8132192022606481), z_dir=(0, -1, 0)) * Cylinder(25.499999993, 12, mode=Mode.PRIVATE)
    add(fillet1_piece_3)
    with BuildSketch(Plane(origin=(42.070086822, 9.225462477, 33.969736214), x_dir=(0.7320905057300818, 0, -0.6812073776904307), z_dir=(0, -1, 0))) as fillet1_piece_4_section:
        with BuildLine():
            CenterArc((FILLET1_R * 0.435455206446, FILLET1_R), FILLET1_R, 222.93806399, 47.06193601)
            Line((-FILLET1_R * 0.296635299284, FILLET1_R * 0.31879262231), (-FILLET1_R * 0.311277109399, FILLET1_R * 0.305168474756))
            Line((-FILLET1_R * 0.311277109399, FILLET1_R * 0.305168474756), (-FILLET1_R * 0.00870910412891, -FILLET1_R * 0.02))
            Line((-FILLET1_R * 0.00870910412891, -FILLET1_R * 0.02), (FILLET1_R * 0.435455206446, -FILLET1_R * 0.02))
            Line((FILLET1_R * 0.435455206446, -FILLET1_R * 0.02), (FILLET1_R * 0.435455206446, 0))
        make_face()
    fillet1_piece_4 = extrude(amount=9.225462477, mode=Mode.PRIVATE)
    fillet1_piece_4 = split(fillet1_piece_4, bisect_by=Plane(origin=(42.053770569, 4, 34.711299155), z_dir=(0, 1, 0)), keep=Keep.TOP, mode=Mode.PRIVATE)
    fillet1_piece_4 = fillet1_piece_4 - Plane(origin=(27.230170636, 6, 13.850668461), x_dir=(0.38140447363659175, 0, 0.9244082580169839), z_dir=(0, -1, 0)) * Cylinder(25.499999993, 22, mode=Mode.PRIVATE)
    fillet1_piece_4 = split(fillet1_piece_4, bisect_by=Plane(origin=(42.053770569, 8, 34.711299155), z_dir=(0, -1, 0)), keep=Keep.TOP, mode=Mode.PRIVATE)
    add(fillet1_piece_4)
    with BuildSketch(Plane(origin=(42.070086822, 4, 33.969736214), x_dir=(0.7320905057300818, 0, -0.6812073776904307), z_dir=(0, -1, 0))) as fillet1_piece_5_section:
        with BuildLine():
            CenterArc((FILLET1_R * 0.435455206446, FILLET1_R), FILLET1_R, 222.93806399, 47.06193601)
            Line((-FILLET1_R * 0.296635299284, FILLET1_R * 0.31879262231), (-FILLET1_R * 0.311277109399, FILLET1_R * 0.305168474756))
            Line((-FILLET1_R * 0.311277109399, FILLET1_R * 0.305168474756), (-FILLET1_R * 0.00870910412891, -FILLET1_R * 0.02))
            Line((-FILLET1_R * 0.00870910412891, -FILLET1_R * 0.02), (FILLET1_R * 0.435455206446, -FILLET1_R * 0.02))
            Line((FILLET1_R * 0.435455206446, -FILLET1_R * 0.02), (FILLET1_R * 0.435455206446, 0))
        make_face()
    fillet1_piece_5 = extrude(amount=4, mode=Mode.PRIVATE)
    fillet1_piece_5 = fillet1_piece_5 & Plane(origin=(27.230170636, 2, 13.850668461), x_dir=(0.38140447363659175, 0, 0.9244082580169839), z_dir=(0, -1, 0)) * Cylinder(25.499999993, 12, mode=Mode.PRIVATE)
    add(fillet1_piece_5)
    with BuildSketch(Plane(origin=(42.070086822, 4, 33.969736214), x_dir=(0.7320905057300818, 0, -0.6812073776904307), z_dir=(0, -1, 0))) as fillet1_piece_6_section:
        with BuildLine():
            CenterArc((FILLET1_R * 0.435455206446, FILLET1_R), FILLET1_R, 222.93806399, 47.06193601)
            Line((-FILLET1_R * 0.296635299284, FILLET1_R * 0.31879262231), (-FILLET1_R * 0.311277109399, FILLET1_R * 0.305168474756))
            Line((-FILLET1_R * 0.311277109399, FILLET1_R * 0.305168474756), (-FILLET1_R * 0.00870910412891, -FILLET1_R * 0.02))
            Line((-FILLET1_R * 0.00870910412891, -FILLET1_R * 0.02), (FILLET1_R * 0.435455206446, -FILLET1_R * 0.02))
            Line((FILLET1_R * 0.435455206446, -FILLET1_R * 0.02), (FILLET1_R * 0.435455206446, 0))
        make_face()
    fillet1_piece_6 = extrude(amount=4, mode=Mode.PRIVATE)
    fillet1_piece_6 = fillet1_piece_6 - Plane(origin=(27.230170636, 2, 13.850668461), x_dir=(0.38140447363659175, 0, 0.9244082580169839), z_dir=(0, -1, 0)) * Cylinder(25.499999993, 12, mode=Mode.PRIVATE)
    add(fillet1_piece_6)
    # the kernel refuses this fillet: 2 mm, written as the material it takes off along each edge
    with BuildSketch(Plane(origin=(46.943557579, 9.225462477, 29.434990566), x_dir=(0, 0, -1), z_dir=(0, -1, 0)), Plane(origin=(46.943557579, 9.225462477, 21.934990566), x_dir=(-0.7320905057300858, 0, -0.6812073776904263), z_dir=(0, -1, 0))) as fillet1_2_piece_1:
        with BuildLine():
            CenterArc((FILLET1_R * 0.435455206446, -FILLET1_R), FILLET1_R, 90, 47.06193601)
            Line((-FILLET1_R * 0.296635299284, -FILLET1_R * 0.31879262231), (-FILLET1_R * 0.311277109399, -FILLET1_R * 0.305168474756))
            Line((-FILLET1_R * 0.311277109399, -FILLET1_R * 0.305168474756), (-FILLET1_R * 0.00870910412891, FILLET1_R * 0.02))
            Line((-FILLET1_R * 0.00870910412891, FILLET1_R * 0.02), (FILLET1_R * 0.435455206446, FILLET1_R * 0.02))
            Line((FILLET1_R * 0.435455206446, FILLET1_R * 0.02), (FILLET1_R * 0.435455206446, 0))
        make_face()
    extrude(amount=14.450924955, mode=Mode.SUBTRACT)


solid = cut_extrude1_kept_piece.part
